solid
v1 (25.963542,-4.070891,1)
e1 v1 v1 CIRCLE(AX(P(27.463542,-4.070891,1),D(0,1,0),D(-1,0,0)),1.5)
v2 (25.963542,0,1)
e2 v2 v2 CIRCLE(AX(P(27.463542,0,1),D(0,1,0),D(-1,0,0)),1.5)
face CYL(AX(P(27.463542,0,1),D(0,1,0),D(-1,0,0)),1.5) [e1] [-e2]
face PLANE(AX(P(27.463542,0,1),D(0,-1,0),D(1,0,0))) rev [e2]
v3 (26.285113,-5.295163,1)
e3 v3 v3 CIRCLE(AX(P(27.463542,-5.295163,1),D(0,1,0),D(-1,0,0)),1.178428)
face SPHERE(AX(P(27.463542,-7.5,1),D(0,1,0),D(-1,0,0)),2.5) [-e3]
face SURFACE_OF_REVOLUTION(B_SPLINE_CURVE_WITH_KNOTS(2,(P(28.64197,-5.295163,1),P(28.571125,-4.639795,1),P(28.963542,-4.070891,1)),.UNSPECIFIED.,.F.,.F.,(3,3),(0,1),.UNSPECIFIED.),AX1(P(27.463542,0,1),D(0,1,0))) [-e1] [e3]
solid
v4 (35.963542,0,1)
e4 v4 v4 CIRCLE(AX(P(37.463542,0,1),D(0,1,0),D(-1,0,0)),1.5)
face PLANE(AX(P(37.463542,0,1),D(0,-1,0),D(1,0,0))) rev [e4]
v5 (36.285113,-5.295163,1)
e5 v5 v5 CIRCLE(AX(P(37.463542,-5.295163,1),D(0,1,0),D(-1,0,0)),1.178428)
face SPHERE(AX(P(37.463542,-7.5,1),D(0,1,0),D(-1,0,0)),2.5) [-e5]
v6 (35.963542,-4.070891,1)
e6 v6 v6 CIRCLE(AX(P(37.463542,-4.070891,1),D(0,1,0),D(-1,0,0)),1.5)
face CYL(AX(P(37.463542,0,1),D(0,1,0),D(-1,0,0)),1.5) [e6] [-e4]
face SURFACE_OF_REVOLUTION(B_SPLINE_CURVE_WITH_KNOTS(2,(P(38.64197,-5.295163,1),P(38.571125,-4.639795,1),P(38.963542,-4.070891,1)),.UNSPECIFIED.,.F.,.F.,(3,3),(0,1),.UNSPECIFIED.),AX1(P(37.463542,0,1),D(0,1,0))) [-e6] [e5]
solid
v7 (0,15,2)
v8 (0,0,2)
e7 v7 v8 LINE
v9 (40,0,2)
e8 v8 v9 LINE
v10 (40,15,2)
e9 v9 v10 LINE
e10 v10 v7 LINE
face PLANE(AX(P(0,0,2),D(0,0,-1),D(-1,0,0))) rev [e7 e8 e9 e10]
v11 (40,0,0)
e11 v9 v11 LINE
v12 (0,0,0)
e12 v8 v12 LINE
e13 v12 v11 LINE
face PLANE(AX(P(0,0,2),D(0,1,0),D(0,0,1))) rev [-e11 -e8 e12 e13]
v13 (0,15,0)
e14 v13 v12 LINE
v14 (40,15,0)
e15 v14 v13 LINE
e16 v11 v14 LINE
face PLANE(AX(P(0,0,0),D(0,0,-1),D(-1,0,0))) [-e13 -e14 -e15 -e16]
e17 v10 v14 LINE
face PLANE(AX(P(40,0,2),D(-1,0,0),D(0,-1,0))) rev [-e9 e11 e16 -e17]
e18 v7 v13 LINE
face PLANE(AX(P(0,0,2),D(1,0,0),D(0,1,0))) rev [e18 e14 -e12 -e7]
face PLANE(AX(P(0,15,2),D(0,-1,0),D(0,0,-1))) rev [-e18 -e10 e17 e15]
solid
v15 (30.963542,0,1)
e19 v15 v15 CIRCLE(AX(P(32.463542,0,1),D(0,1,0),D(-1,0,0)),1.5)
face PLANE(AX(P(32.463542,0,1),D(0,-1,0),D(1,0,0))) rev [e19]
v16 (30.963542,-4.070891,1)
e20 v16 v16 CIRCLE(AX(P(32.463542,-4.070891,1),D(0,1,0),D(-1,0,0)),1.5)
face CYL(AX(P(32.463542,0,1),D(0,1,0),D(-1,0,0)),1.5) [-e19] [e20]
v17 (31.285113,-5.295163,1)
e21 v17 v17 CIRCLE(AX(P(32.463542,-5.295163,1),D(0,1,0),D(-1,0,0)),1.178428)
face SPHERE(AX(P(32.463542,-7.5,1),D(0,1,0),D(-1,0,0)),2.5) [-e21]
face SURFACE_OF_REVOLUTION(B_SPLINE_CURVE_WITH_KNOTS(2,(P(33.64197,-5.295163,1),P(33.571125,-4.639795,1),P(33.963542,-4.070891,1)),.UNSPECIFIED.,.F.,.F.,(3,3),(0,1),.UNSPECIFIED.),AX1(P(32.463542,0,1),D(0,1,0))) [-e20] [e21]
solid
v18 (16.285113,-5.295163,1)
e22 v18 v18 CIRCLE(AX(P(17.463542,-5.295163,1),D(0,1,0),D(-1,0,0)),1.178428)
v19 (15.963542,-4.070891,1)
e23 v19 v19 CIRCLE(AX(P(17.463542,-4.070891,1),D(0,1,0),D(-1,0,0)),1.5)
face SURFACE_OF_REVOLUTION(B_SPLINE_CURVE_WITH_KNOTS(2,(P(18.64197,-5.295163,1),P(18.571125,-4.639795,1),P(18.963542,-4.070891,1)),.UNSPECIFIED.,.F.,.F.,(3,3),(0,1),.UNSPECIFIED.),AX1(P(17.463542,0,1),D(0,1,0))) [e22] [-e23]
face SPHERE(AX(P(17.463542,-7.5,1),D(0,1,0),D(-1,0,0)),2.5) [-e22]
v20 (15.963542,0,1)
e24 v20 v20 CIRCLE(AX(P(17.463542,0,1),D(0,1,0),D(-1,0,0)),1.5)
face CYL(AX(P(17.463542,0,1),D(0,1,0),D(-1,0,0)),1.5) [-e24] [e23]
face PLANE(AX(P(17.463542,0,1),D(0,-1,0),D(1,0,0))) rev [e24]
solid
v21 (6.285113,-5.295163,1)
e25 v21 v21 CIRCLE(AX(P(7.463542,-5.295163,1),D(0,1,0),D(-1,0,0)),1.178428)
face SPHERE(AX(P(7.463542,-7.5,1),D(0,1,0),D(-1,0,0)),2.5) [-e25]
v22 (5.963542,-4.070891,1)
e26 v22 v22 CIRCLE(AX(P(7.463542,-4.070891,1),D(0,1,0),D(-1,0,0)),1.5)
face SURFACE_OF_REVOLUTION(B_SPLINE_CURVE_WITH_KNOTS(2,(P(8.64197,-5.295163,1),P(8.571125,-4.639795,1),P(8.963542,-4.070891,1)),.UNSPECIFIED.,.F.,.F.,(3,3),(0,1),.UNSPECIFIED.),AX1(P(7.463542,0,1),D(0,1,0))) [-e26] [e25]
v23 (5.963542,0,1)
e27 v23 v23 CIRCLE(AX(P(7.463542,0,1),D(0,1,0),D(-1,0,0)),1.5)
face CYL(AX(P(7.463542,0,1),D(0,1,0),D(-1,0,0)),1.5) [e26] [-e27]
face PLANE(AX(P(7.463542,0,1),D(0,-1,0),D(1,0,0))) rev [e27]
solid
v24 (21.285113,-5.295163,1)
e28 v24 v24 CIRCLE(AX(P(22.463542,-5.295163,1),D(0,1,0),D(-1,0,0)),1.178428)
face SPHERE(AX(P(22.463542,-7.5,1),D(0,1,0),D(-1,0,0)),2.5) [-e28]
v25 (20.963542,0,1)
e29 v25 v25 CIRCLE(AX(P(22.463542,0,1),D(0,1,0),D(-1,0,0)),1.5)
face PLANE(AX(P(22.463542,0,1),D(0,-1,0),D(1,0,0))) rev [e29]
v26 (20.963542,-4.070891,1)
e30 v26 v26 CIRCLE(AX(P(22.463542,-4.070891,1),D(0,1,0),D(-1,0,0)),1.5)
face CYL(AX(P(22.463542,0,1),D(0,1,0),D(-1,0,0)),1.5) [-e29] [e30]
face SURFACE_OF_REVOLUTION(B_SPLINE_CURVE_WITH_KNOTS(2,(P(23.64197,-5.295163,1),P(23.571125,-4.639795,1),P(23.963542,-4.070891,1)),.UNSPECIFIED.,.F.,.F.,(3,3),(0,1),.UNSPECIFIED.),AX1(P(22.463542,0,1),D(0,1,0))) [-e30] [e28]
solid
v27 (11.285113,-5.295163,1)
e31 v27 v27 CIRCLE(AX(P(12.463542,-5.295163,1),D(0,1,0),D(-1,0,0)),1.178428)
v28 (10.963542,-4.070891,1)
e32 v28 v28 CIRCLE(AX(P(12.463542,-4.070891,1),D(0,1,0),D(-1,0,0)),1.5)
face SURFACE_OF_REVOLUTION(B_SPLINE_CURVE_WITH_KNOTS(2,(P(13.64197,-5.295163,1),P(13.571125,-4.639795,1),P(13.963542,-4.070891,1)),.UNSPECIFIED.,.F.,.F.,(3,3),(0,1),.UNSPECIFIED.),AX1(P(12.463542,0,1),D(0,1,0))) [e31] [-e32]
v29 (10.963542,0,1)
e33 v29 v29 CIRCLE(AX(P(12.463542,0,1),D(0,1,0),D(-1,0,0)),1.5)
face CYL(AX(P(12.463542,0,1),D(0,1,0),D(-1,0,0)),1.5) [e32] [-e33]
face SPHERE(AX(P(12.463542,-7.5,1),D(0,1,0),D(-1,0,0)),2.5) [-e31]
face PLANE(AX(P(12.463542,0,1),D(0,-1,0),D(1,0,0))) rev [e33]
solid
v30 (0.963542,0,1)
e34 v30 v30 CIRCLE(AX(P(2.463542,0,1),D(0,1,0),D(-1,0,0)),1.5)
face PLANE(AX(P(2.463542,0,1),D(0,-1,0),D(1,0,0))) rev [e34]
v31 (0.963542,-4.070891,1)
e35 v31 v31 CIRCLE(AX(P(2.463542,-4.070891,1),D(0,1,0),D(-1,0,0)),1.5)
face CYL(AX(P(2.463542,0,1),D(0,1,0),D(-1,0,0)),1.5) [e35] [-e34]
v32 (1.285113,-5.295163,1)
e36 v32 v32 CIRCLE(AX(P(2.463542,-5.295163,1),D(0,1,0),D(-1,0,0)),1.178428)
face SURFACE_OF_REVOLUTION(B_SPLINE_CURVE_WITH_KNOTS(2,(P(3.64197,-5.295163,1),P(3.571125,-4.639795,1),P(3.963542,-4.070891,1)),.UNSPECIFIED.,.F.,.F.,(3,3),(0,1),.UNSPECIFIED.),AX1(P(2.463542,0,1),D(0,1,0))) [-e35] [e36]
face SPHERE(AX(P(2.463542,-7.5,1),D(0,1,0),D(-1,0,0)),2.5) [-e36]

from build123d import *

# Parameters (mm, degrees)
SKETCH_1_W      = 40
SKETCH_1_H      = 15
EXTRUDE_1_DEPTH = 2


# Read off the part's stored shape, not the designer's step: 实体-移动/复制3
with BuildPart() as part:
    # 草图1 → 凸台-拉伸1 (new body)
    with BuildSketch(Plane.XY):
        with Locations((20, 7.5)):
            Rectangle(SKETCH_1_W, SKETCH_1_H)
    extrude(amount=EXTRUDE_1_DEPTH)


with BuildPart() as body_2:
    # 草图4 → 旋转2 (revolve)
    with BuildSketch(Plane.XY.offset(1), mode=Mode.PRIVATE) as revolve_2_sk:
        with BuildLine():
            Line((1.713541635, 0), (3.213541635, 0))
            Line((3.213541635, 0), (3.213541635, -4.070890859))
            add(Edge.make_bspline(
                [(3.213541635, -4.070890859), (2.821125169, -4.639795434), (2.891969931, -5.295162875)],
                knots=[0, 0, 0, 1, 1, 1], degree=2))
            ThreePointArc((2.891969931, -5.295162875), (4.138628521, -8.107415503), (1.713541635, -10))
            Line((1.713541635, -10), (1.713541635, 0))
        make_face()
    revolve(revolve_2_sk.sketch.rotate(Axis((1.713541635, 0, 1), (0, -1, 0)), 180), axis=Axis((1.713541635, 0, 1), (0, -1, 0)))


with BuildPart() as body_3:
    # Move Body 2: copy of body 2
    add(body_2.part.moved(Location((5, 0, 0))))


with BuildPart() as body_4:
    # Move Body 3 outline → Move Body 3 (revolve)
    with BuildSketch(Plane(origin=(36.713541635, 0, 1), x_dir=(1, 0, 0), z_dir=(0, 0, 1))):
        with BuildLine():
            ThreePointArc((0, -10), (2.425086887, -8.107415503), (1.178428296, -5.295162874))
            add(Edge.make_bspline(
                [(1.178428296, -5.295162874), (1.107583535, -4.639795434), (1.5, -4.070890859)],
                knots=[0, 0, 0, 1, 1, 1], degree=2))
            Line((1.5, -4.070890859), (1.5, 0))
            Line((1.5, 0), (0, 0))
            Line((0, 0), (0, -10))
        make_face()
    revolve(axis=Axis((36.713541635, 0, 1), (0, 1, 0)))


with BuildPart() as body_5:
    # Move Body 3 2 outline → Move Body 3 2 (revolve)
    with BuildSketch(Plane(origin=(31.713541635, 0, 1), x_dir=(1, 0, 0), z_dir=(0, 0, 1))):
        with BuildLine():
            ThreePointArc((0, -10), (2.425086887, -8.107415503), (1.178428296, -5.295162874))
            add(Edge.make_bspline(
                [(1.178428296, -5.295162874), (1.107583535, -4.639795434), (1.5, -4.070890859)],
                knots=[0, 0, 0, 1, 1, 1], degree=2))
            Line((1.5, -4.070890859), (1.5, 0))
            Line((1.5, 0), (0, 0))
            Line((0, 0), (0, -10))
        make_face()
    revolve(axis=Axis((31.713541635, 0, 1), (0, 1, 0)))


with BuildPart() as body_6:
    # Move Body 3 3 outline → Move Body 3 3 (revolve)
    with BuildSketch(Plane(origin=(26.713541635, 0, 1), x_dir=(1, 0, 0), z_dir=(0, 0, 1))):
        with BuildLine():
            ThreePointArc((0, -10), (2.425086887, -8.107415503), (1.178428296, -5.295162874))
            add(Edge.make_bspline(
                [(1.178428296, -5.295162874), (1.107583535, -4.639795434), (1.5, -4.070890859)],
                knots=[0, 0, 0, 1, 1, 1], degree=2))
            Line((1.5, -4.070890859), (1.5, 0))
            Line((1.5, 0), (0, 0))
            Line((0, 0), (0, -10))
        make_face()
    revolve(axis=Axis((26.713541635, 0, 1), (0, 1, 0)))


with BuildPart() as body_7:
    # Move Body 3 4 outline → Move Body 3 4 (revolve)
    with BuildSketch(Plane(origin=(21.713541635, 0, 1), x_dir=(1, 0, 0), z_dir=(0, 0, 1))):
        with BuildLine():
            ThreePointArc((0, -10), (2.425086887, -8.107415503), (1.178428296, -5.295162874))
            add(Edge.make_bspline(
                [(1.178428296, -5.295162874), (1.107583535, -4.639795434), (1.5, -4.070890859)],
                knots=[0, 0, 0, 1, 1, 1], degree=2))
            Line((1.5, -4.070890859), (1.5, 0))
            Line((1.5, 0), (0, 0))
            Line((0, 0), (0, -10))
        make_face()
    revolve(axis=Axis((21.713541635, 0, 1), (0, 1, 0)))


with BuildPart() as body_8:
    # Move Body 3 5 outline → Move Body 3 5 (revolve)
    with BuildSketch(Plane(origin=(16.713541635, 0, 1), x_dir=(1, 0, 0), z_dir=(0, 0, 1))):
        with BuildLine():
            ThreePointArc((0, -10), (2.425086887, -8.107415503), (1.178428296, -5.295162874))
            add(Edge.make_bspline(
                [(1.178428296, -5.295162874), (1.107583535, -4.639795434), (1.5, -4.070890859)],
                knots=[0, 0, 0, 1, 1, 1], degree=2))
            Line((1.5, -4.070890859), (1.5, 0))
            Line((1.5, 0), (0, 0))
            Line((0, 0), (0, -10))
        make_face()
    revolve(axis=Axis((16.713541635, 0, 1), (0, 1, 0)))


with BuildPart() as body_9:
    # Move Body 3 6 outline → Move Body 3 6 (revolve)
    with BuildSketch(Plane(origin=(11.713541635, 0, 1), x_dir=(1, 0, 0), z_dir=(0, 0, 1))):
        with BuildLine():
            ThreePointArc((0, -10), (2.425086887, -8.107415503), (1.178428296, -5.295162874))
            add(Edge.make_bspline(
                [(1.178428296, -5.295162874), (1.107583535, -4.639795434), (1.5, -4.070890859)],
                knots=[0, 0, 0, 1, 1, 1], degree=2))
            Line((1.5, -4.070890859), (1.5, 0))
            Line((1.5, 0), (0, 0))
            Line((0, 0), (0, -10))
        make_face()
    revolve(axis=Axis((11.713541635, 0, 1), (0, 1, 0)))


with BuildPart() as body_2_1:
    # Move Body 4: moved
    add(body_2.part.moved(Location((0.75, 0, 0))))


with BuildPart() as body_3_1:
    # Move Body 4: moved
    add(body_3.part.moved(Location((0.75, 0, 0))))


with BuildPart() as body_9_1:
    # Move Body 4: moved
    add(body_9.part.moved(Location((0.75, 0, 0))))


with BuildPart() as body_8_1:
    # Move Body 4: moved
    add(body_8.part.moved(Location((0.75, 0, 0))))


with BuildPart() as body_7_1:
    # Move Body 4: moved
    add(body_7.part.moved(Location((0.75, 0, 0))))


with BuildPart() as body_6_1:
    # Move Body 4: moved
    add(body_6.part.moved(Location((0.75, 0, 0))))


with BuildPart() as body_5_1:
    # Move Body 4: moved
    add(body_5.part.moved(Location((0.75, 0, 0))))


with BuildPart() as body_4_1:
    # Move Body 4: moved
    add(body_4.part.moved(Location((0.75, 0, 0))))


solid = Compound([part.part, body_2_1.part, body_3_1.part, body_9_1.part, body_8_1.part, body_7_1.part, body_6_1.part, body_5_1.part, body_4_1.part])
